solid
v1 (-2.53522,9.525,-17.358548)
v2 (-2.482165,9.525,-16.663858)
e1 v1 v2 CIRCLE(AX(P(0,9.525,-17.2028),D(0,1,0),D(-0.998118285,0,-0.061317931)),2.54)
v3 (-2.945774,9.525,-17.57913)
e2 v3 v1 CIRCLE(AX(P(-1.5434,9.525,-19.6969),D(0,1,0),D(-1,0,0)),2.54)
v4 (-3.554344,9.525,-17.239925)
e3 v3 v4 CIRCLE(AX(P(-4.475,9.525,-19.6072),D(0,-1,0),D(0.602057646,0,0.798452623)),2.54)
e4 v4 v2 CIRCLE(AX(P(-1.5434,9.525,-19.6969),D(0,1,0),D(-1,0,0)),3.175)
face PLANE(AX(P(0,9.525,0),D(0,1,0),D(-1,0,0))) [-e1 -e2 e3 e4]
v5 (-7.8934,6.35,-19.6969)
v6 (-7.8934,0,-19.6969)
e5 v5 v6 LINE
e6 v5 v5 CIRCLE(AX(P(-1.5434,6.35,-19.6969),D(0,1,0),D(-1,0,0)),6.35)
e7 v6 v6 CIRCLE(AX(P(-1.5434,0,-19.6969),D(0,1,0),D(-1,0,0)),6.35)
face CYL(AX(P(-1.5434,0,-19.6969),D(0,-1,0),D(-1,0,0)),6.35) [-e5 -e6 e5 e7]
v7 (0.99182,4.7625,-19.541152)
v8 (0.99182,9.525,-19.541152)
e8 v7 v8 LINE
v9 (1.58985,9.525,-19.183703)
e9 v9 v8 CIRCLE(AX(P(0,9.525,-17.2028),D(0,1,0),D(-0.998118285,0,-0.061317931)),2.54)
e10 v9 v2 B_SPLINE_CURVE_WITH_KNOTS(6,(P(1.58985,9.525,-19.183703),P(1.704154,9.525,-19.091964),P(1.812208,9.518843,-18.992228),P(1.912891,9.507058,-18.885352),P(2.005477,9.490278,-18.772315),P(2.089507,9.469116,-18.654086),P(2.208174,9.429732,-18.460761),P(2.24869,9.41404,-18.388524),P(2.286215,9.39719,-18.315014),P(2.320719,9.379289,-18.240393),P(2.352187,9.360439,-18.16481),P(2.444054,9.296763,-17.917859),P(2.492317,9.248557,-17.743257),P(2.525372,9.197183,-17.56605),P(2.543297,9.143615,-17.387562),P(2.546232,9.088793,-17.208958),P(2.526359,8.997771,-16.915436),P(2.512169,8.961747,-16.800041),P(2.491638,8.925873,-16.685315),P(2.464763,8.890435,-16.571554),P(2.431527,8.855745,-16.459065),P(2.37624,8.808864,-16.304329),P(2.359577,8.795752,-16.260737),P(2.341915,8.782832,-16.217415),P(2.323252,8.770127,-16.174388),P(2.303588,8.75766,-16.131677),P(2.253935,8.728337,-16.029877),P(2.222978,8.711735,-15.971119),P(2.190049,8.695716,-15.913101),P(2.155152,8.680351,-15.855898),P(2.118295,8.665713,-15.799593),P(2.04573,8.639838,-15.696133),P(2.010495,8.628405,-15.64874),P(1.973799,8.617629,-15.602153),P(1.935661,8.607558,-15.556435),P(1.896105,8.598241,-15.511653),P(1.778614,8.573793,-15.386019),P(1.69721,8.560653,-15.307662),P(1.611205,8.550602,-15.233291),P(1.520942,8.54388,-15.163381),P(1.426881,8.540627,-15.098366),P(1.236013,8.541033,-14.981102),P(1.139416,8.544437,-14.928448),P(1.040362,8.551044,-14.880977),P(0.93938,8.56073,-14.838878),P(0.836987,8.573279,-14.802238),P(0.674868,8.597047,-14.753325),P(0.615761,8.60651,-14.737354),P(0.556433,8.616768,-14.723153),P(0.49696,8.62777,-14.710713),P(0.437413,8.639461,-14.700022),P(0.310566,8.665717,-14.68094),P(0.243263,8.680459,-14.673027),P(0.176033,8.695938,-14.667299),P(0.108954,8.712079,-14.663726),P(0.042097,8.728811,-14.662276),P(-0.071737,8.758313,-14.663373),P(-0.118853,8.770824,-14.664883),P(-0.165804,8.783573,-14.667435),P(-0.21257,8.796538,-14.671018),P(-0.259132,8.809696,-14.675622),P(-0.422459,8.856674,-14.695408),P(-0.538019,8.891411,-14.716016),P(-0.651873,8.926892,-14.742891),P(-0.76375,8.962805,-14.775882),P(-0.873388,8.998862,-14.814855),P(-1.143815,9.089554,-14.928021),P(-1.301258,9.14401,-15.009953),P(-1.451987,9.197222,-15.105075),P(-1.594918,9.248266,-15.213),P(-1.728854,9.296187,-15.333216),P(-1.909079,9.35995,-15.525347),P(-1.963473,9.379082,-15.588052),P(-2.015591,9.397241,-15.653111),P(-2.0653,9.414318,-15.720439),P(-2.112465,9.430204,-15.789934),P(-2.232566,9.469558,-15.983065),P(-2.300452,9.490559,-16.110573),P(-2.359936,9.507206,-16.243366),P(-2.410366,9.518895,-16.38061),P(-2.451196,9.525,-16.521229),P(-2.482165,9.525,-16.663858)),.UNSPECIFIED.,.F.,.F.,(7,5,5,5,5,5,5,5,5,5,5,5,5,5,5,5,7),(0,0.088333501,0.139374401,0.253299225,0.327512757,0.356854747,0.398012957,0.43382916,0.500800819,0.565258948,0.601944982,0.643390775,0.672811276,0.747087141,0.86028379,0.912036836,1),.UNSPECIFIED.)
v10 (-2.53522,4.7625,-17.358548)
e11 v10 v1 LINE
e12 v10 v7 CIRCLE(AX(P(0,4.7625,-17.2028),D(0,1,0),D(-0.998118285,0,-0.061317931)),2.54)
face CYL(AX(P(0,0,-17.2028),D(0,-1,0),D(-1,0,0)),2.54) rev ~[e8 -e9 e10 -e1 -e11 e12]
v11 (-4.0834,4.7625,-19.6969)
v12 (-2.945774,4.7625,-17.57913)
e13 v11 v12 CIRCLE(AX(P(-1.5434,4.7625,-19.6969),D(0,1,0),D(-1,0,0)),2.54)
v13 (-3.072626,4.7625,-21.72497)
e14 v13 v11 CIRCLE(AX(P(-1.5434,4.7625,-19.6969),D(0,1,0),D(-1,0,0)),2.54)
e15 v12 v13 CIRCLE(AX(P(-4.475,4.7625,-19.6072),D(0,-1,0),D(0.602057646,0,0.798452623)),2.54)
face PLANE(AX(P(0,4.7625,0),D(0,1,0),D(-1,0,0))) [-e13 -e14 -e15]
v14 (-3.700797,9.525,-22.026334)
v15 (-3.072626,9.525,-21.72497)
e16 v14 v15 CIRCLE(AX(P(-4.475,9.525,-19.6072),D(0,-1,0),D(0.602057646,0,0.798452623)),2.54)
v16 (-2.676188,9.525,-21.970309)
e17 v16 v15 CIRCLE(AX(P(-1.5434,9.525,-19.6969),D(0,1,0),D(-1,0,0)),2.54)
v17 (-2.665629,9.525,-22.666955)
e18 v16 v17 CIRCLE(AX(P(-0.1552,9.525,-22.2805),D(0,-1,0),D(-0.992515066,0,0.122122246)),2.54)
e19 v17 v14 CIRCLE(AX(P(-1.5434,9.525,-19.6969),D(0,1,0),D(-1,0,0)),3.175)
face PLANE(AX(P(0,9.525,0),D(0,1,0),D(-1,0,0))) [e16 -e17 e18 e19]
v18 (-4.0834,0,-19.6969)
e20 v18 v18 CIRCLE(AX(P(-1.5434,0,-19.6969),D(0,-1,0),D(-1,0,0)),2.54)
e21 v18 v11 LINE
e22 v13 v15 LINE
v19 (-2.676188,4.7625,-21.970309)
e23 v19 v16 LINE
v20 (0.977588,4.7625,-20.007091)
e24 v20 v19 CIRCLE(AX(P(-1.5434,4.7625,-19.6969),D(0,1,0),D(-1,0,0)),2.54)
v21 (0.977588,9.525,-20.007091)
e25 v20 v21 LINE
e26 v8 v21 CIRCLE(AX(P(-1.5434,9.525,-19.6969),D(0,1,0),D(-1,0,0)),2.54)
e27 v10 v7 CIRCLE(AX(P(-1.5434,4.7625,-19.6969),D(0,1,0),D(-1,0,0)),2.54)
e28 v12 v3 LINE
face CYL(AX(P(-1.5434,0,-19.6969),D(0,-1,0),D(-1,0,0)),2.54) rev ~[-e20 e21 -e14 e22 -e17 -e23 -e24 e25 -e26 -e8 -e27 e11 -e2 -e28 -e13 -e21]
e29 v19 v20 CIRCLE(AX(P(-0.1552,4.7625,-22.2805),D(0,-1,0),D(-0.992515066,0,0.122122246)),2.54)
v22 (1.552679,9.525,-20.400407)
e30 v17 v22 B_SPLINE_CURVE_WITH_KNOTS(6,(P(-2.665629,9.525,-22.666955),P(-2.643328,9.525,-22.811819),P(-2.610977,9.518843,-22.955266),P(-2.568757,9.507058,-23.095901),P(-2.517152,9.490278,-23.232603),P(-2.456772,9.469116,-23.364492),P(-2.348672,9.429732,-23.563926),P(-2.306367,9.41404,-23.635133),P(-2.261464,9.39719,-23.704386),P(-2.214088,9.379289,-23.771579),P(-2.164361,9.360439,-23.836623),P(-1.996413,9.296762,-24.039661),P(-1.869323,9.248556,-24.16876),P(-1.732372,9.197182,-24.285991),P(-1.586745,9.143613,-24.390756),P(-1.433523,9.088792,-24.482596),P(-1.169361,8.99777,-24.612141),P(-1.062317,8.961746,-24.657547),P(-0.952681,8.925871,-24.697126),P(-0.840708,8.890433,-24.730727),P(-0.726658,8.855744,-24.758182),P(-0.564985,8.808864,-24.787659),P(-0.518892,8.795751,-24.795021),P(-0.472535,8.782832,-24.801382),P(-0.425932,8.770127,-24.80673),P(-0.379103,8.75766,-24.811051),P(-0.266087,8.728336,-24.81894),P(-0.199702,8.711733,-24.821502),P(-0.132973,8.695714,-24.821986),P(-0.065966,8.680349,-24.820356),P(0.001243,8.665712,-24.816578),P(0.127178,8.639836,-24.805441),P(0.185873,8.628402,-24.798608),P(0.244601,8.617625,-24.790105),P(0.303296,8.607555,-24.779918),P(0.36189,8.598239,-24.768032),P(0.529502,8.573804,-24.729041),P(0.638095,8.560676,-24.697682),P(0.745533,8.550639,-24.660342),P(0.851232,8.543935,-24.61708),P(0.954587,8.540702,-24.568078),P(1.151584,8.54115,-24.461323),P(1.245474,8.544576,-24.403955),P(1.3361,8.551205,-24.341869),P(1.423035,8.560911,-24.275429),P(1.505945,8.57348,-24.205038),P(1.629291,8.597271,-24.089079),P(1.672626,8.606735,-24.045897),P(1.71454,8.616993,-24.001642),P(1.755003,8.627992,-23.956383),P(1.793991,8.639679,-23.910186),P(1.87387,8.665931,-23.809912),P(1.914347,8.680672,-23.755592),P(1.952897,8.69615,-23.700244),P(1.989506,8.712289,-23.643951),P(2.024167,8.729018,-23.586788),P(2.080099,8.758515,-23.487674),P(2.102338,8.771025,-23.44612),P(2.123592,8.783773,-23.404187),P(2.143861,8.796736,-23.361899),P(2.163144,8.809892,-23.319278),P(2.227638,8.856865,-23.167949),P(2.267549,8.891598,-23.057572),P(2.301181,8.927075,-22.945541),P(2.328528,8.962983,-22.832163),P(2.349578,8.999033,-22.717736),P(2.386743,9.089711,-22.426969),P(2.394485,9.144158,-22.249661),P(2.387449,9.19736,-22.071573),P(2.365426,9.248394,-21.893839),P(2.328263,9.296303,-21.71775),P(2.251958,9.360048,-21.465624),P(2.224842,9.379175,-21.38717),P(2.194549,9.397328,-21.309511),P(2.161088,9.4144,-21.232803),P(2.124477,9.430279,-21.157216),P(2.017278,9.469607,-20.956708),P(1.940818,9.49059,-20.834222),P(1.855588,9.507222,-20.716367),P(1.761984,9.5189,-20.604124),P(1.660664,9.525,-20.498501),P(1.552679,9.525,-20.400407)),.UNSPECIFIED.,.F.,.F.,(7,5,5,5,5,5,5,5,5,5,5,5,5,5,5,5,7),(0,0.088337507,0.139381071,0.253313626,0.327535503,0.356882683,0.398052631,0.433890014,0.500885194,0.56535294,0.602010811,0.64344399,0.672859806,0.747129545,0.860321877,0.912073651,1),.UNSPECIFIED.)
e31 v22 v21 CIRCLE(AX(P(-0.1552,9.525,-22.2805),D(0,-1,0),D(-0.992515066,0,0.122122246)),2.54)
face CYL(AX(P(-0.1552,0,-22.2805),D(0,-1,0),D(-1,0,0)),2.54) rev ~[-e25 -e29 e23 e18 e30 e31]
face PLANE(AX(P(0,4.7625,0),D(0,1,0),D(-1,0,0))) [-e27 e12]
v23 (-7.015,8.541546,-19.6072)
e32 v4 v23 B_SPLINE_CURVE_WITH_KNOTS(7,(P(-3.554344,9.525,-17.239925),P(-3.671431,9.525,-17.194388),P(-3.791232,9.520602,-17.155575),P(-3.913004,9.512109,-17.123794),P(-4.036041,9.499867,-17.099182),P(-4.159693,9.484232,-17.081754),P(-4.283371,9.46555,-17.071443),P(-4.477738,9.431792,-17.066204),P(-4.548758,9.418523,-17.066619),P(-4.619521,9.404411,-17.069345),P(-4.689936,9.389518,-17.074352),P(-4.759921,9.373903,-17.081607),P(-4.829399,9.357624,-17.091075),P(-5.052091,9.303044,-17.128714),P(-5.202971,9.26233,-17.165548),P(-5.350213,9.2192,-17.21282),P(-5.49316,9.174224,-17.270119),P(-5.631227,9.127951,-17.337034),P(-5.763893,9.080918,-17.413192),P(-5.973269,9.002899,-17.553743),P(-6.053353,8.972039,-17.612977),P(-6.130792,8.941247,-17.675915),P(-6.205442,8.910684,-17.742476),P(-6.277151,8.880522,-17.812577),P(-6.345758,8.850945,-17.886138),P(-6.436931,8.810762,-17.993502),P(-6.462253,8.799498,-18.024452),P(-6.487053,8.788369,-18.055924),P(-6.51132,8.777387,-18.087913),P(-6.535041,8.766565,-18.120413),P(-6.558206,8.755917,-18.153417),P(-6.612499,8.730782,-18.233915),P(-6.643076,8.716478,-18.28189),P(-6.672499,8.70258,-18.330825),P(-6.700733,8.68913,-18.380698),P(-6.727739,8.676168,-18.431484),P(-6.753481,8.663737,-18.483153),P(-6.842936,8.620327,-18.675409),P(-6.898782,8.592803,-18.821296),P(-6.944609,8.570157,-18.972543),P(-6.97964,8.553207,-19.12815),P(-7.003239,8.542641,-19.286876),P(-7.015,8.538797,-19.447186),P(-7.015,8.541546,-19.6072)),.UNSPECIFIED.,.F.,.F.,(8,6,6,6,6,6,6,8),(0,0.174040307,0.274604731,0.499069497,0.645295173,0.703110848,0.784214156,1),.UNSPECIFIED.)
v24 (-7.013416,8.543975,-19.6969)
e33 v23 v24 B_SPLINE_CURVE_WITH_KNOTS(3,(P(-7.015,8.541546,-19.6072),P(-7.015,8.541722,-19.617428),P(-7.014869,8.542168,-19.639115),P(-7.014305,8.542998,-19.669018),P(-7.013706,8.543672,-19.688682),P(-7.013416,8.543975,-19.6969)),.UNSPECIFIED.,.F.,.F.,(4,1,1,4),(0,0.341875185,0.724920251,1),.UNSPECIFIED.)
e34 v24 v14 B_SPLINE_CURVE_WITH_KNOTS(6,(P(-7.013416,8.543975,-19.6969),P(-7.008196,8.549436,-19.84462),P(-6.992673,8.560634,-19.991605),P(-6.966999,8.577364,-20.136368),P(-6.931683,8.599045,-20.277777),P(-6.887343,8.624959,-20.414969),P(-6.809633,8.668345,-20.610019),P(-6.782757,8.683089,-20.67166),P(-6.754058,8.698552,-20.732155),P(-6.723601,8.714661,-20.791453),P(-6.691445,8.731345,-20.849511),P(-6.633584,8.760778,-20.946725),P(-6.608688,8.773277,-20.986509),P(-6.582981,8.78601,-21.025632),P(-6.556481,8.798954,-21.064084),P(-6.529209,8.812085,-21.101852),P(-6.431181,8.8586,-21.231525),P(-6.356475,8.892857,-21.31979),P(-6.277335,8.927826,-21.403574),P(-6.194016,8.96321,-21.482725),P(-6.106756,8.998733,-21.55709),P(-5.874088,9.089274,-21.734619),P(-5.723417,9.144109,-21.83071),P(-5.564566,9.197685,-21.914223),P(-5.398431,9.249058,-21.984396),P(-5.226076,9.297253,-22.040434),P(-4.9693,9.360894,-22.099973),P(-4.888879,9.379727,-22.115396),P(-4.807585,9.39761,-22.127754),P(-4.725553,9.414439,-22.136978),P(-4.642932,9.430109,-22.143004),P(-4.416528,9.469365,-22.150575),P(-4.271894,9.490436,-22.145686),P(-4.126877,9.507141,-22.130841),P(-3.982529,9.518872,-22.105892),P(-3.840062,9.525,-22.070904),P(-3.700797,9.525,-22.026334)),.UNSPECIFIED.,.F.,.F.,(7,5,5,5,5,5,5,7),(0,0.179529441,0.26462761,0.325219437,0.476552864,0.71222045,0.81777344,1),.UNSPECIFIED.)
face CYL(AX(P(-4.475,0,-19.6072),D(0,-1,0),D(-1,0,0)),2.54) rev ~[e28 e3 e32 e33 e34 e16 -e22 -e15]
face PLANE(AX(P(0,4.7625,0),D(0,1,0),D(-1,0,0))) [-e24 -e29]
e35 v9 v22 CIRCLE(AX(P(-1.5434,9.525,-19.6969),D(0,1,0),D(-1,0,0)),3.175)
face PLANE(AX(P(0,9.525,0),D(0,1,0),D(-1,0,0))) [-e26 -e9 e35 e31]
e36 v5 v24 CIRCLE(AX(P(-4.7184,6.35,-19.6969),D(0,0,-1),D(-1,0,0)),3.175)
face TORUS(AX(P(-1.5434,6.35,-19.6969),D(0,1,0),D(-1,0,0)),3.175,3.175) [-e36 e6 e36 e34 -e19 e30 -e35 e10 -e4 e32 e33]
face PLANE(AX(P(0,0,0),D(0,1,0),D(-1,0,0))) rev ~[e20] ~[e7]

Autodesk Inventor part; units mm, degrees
ref_plane "YZ Plane" through (0, 0, 0) normal (1, 0, 0) x (0, 1, 0)
ref_plane "XZ Plane" through (0, 0, 0) normal (0, 1, 0) x (-1, 0, 0)
ref_plane "XY Plane" through (0, 0, 0) normal (0, 0, 1) x (1, 0, 0)
sketch "Sketch1" plane through (0, 0, 0) normal (0, 1, 0) x (-1, 0, 0)
  circle A0 centre (0, -17.2028) radius 2.54
  circle A1 centre (0.1552, -22.2805) radius 2.54
  line L0 (0, -17.2028) -> (4.826, -17.2028) construction
  circle A2 centre (4.475, -19.6072) radius 2.54
  circle A3 centre (1.5434, -19.6969) radius 2.54
  circle A4 centre (1.5434, -19.6969) radius 6.35
  line L1 (0.1552, -22.2805) -> (0, -17.2028)
  line L2 (4.475, -19.6072) -> (0, -17.2028)
  line L3 (4.475, -19.6072) -> (0.1552, -22.2805)
  line L4 (2.3151, -20.9439) -> (0, -17.2028)
  line L5 (0.1552, -22.2805) -> (2.2375, -18.405)
  line L6 (0.0776, -19.7417) -> (4.475, -19.6072)
  point P0 (3.0726, -21.725)
  point P1 (2.6762, -21.9703)
  point P2 (-0.9776, -20.0071)
  point P3 (-0.9918, -19.5412)
  point P4 (2.5352, -17.3585)
  point P5 (2.9458, -17.5791)
  dimension "d3" = 5.08
  dimension "d7" = 5.08
  dimension "d8" = 12.7
  dimension "d14" = 5.08
  dimension "d15" = 5.08
extrude "Extrusion1" add sketch "Sketch1" along normal blind 4.7625 contours A0 A3 L2 L1 | L1 L4 A3 | A3 L1 L3 A1 | A2 A3 L3 L2 | A3 L4 L2 | A3 L5 L1 | L2 L6 A3 | A3 L3 L5 | L6 L3 A3 | A4
extrude "Extrusion2" add sketch "Sketch1" along normal blind 9.525
fillet "Fillet1" radius 3.175 1 edges at (4.8066, 9.525, -19.6969)
properties part number "PluckTool"
